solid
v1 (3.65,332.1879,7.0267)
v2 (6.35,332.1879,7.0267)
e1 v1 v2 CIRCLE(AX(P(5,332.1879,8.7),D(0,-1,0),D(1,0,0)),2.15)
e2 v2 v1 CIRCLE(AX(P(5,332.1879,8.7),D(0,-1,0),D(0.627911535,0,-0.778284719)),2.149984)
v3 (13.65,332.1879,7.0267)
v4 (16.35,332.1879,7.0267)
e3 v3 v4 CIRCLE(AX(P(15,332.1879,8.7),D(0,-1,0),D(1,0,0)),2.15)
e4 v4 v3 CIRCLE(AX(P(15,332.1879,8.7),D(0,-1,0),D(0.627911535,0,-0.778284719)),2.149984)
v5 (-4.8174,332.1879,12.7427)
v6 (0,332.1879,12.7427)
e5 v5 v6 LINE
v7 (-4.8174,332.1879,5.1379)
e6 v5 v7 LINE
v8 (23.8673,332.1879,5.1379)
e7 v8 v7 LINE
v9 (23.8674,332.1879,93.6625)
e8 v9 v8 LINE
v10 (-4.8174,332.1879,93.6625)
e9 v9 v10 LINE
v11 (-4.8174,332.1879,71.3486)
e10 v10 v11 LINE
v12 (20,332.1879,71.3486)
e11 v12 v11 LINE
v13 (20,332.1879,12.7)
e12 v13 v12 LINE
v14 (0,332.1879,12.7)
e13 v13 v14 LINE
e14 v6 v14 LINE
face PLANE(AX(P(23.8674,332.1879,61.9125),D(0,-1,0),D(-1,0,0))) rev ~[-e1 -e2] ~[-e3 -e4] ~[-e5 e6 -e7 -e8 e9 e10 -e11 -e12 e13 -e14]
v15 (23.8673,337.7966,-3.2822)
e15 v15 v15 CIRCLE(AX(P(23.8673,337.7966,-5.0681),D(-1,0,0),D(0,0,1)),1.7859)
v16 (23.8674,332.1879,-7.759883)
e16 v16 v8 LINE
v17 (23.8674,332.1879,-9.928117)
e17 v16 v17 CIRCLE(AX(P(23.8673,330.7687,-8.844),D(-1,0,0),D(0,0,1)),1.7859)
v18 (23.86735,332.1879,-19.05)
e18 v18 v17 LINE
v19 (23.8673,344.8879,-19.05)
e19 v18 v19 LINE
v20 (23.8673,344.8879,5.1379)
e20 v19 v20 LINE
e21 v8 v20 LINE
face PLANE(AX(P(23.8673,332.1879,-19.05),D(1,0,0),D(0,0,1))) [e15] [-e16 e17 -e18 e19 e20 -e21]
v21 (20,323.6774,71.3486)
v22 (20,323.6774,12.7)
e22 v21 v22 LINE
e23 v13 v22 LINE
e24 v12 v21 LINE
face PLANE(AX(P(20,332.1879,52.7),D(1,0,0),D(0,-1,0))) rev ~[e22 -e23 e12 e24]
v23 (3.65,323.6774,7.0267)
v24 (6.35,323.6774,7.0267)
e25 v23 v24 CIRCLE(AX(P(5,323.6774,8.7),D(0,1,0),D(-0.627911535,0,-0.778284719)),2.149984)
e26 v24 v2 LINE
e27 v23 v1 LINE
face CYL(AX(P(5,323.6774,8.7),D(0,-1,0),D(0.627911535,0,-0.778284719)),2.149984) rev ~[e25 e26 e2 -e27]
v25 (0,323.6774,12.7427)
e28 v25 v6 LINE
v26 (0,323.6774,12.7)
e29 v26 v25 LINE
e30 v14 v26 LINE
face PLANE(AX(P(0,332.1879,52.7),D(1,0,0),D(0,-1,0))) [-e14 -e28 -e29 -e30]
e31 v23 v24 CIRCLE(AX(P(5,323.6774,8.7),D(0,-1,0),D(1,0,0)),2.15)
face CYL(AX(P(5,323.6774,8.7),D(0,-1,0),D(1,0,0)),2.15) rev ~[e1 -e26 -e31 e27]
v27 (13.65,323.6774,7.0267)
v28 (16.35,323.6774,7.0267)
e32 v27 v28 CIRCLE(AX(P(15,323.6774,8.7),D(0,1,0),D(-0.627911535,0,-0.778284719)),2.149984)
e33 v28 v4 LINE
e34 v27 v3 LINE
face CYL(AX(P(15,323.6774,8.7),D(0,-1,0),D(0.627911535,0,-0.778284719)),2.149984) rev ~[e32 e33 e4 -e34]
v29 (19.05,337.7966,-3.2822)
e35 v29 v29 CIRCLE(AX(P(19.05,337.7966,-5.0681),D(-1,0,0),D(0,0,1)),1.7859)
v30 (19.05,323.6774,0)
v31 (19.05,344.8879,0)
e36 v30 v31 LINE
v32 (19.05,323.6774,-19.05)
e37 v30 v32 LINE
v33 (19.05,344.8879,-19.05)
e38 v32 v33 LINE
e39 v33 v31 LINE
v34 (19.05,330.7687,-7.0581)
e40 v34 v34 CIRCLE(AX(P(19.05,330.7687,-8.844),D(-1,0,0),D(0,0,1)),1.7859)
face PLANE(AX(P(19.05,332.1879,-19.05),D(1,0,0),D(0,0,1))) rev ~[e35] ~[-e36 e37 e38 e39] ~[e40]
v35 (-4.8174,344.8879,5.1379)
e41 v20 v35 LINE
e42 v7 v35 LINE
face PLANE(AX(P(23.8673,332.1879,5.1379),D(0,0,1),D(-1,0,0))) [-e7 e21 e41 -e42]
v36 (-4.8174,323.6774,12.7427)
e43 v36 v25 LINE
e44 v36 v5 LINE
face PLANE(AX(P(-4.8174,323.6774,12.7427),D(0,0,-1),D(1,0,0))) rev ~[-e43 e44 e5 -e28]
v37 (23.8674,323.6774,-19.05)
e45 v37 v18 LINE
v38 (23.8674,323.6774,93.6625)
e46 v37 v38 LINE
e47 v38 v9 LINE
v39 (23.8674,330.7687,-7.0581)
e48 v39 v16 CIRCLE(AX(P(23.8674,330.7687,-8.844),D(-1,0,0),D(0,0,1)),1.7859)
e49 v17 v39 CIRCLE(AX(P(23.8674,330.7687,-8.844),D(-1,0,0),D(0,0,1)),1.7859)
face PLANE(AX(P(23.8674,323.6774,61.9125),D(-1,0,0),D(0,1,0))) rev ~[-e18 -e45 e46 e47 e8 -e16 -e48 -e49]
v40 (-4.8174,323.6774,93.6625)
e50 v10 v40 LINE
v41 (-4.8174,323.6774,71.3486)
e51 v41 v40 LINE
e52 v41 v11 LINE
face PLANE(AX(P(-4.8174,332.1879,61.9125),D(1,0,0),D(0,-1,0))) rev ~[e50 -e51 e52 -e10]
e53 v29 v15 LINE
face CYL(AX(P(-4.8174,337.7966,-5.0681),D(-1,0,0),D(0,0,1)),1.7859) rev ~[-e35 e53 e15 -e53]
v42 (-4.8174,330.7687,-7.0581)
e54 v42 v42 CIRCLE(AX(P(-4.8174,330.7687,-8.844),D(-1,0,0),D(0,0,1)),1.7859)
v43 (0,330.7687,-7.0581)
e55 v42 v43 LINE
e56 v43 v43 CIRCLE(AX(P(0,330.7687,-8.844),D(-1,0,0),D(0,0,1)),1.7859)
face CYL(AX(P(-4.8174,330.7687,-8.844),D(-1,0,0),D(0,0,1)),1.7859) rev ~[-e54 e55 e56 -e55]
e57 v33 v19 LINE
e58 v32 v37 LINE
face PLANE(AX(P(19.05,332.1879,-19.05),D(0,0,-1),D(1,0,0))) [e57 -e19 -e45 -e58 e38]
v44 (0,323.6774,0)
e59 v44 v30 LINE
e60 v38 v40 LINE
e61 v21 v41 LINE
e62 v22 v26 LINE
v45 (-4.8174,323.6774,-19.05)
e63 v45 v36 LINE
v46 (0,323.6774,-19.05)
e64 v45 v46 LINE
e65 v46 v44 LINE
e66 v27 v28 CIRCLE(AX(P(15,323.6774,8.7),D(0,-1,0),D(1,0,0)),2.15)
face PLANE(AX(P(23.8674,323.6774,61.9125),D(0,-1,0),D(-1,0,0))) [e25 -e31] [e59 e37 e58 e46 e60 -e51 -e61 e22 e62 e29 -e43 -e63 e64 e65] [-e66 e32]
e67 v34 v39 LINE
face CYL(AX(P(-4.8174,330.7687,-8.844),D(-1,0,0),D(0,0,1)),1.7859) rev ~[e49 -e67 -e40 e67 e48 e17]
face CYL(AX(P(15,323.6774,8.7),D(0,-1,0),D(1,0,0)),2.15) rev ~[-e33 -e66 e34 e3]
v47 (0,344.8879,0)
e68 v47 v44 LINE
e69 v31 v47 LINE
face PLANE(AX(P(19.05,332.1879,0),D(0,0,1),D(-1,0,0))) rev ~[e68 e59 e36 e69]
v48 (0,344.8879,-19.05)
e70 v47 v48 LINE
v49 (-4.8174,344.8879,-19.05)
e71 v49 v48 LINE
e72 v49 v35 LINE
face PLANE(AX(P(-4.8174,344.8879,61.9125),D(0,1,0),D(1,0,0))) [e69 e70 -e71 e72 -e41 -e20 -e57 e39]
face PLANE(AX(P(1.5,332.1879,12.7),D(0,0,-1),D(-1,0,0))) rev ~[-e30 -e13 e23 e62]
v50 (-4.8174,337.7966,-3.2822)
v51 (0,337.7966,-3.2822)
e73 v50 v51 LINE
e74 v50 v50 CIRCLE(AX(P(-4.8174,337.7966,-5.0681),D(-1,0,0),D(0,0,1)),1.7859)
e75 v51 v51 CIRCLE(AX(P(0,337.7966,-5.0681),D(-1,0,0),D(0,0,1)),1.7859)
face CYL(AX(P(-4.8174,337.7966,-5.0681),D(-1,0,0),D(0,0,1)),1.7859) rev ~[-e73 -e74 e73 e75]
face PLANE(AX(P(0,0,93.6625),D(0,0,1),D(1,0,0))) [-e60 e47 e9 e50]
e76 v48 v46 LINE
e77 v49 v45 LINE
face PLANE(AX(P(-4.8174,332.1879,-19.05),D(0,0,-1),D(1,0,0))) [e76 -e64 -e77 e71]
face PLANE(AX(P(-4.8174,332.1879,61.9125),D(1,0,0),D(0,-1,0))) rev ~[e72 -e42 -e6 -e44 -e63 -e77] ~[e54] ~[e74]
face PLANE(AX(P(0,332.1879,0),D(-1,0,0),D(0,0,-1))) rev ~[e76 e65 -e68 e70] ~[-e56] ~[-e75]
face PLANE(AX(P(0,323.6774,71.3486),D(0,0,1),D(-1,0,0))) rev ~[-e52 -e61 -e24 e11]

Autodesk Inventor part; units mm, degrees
ref_plane "YZ Plane" through (0, 0, 0) normal (1, 0, 0) x (0, 1, 0)
ref_plane "Work Plane1" through (0, 0, 0) normal (0, 0, 1) x (1, 0, 0)
ref_plane "Work Plane2" through (0, 0, 0) normal (0, 0, 1) x (1, 0, 0)
sketch "Sketch2" plane through (0, 0, 0) normal (0, 0, 1) x (1, 0, 0)
  line L0 (0, 0) -> (19.05, 0) projected
  line L1 (19.05, 0) -> (19.05, 431.8) construction
  line L2 (0, 431.8) -> (19.05, 431.8) projected
  line L3 (0, 0) -> (0, 431.8) construction
  line L4 (18.5, 323.6774) -> (1.5, 323.6774) projected
  line L5 (18.5, 323.6774) -> (19.1476, 323.6774)
  line L6 (1.5, 323.6774) -> (0, 323.6774)
  line L7 (-4.8174, 323.6774) -> (23.8674, 323.6774)
  line L8 (23.8674, 323.6774) -> (23.8674, 332.1879)
  line L9 (23.8674, 332.1879) -> (-4.8174, 332.1879)
  line L10 (-4.8174, 332.1879) -> (-4.8174, 323.6774)
  line L11 (9.525, 431.8) -> (9.525, 312.4258) construction
  line L12 (9.525, 327.9326) -> (-4.8174, 327.9326) construction
  line L13 (23.8674, 327.9326) -> (9.525, 327.9326) construction
extrude "Extrusion1" add sketch "Sketch2" along normal blind 61.9125
sketch "Sketch3" plane through (-4.8174, 323.6774, 0) normal (0, -1, 0) x (1, 0, 0)
  arc A0 (8.4674, 58.3733) -> (11.1674, 58.3733) centre (9.8174, 56.7) ccw projected
  arc A1 (18.4674, 58.3733) -> (21.1674, 58.3733) centre (19.8174, 56.7) ccw projected
  arc A2 (11.1674, 7.0267) -> (8.4674, 7.0267) centre (9.8174, 8.7) ccw projected
  arc A3 (21.1674, 7.0267) -> (18.4674, 7.0267) centre (19.8174, 8.7) ccw projected
  circle A4 centre (9.8174, 8.7) radius 2.15
  circle A5 centre (19.8174, 8.7) radius 2.15
  circle A6 centre (9.8174, 56.7) radius 2.15
  circle A7 centre (19.8174, 56.7) radius 2.15
  point P0 (4.8174, 0)
extrude "Extrusion2" cut sketch "Sketch3" against normal through all
sketch "Sketch4" plane through (-4.8174, 332.1879, 0) normal (0, 1, 0) x (1, 0, 0)
  line L0 (4.8174, -14.2) -> (4.8174, -51.2) projected
  line L1 (6.3174, -52.7) -> (23.3174, -52.7) projected
  line L2 (24.8174, -51.2) -> (24.8174, -14.2) projected
  line L3 (23.3174, -12.7) -> (6.3174, -12.7) projected
  line L4 (4.8174, -52.7) -> (24.8174, -52.7)
  line L5 (24.8174, -52.7) -> (24.8174, -12.7)
  line L6 (24.8174, -12.7) -> (4.8174, -12.7)
  line L7 (4.8174, -12.7) -> (4.8174, -52.7)
  point P0 (4.8174, 0)
extrude "Extrusion3" cut sketch "Sketch4" against normal through all
sketch "Sketch6" plane through (0, 0, 0) normal (0, 0, -1) x (-1, 0, 0)
  line L0 (4.8174, 323.6774) -> (-23.8674, 323.6774) projected
  line L1 (4.8174, 332.1879) -> (4.8174, 323.6774) projected
  line L2 (-23.8674, 332.1879) -> (4.8174, 332.1879) projected
  line L3 (-23.8674, 323.6774) -> (-23.8674, 332.1879) projected
  point P0 (0, 0)
extrude "Extrusion4" add sketch "Sketch6" along normal blind 19.05
sketch "Sketch7" plane through (-4.8174, 332.1879, 61.9125) normal (0, 1, 0) x (1, 0, 0)
  line L0 (4.8174, 70.6755) -> (4.8174, 80.9625) projected
  line L1 (4.8174, 61.9125) -> (4.8174, 70.6755) projected
  line L2 (23.8674, 61.9125) -> (23.8674, 70.6755) projected
  line L3 (23.8674, 71.4375) -> (23.8674, 80.9625) projected
  line L4 (23.8674, 61.9125) -> (4.8174, 61.9125)
  line L5 (4.8174, 61.9125) -> (4.8174, 80.9625)
  line L6 (4.8174, 80.9625) -> (23.8674, 80.9625)
  line L7 (23.8674, 80.9625) -> (23.8674, 61.9125)
extrude "Extrusion5" cut sketch "Sketch7" against normal through all
sketch "Sketch8" plane through (-4.8174, 332.1879, 61.9125) normal (0, 1, 0) x (1, 0, 0)
  line L0 (28.6847, 80.9625) -> (28.6847, 0) projected
  line L1 (0, 80.9625) -> (0, 0) projected
  line L2 (4.8174, 61.9125) -> (4.8174, 80.9625) projected
  line L3 (0, 80.9625) -> (4.8174, 80.9625) projected
  line L4 (0, 80.9625) -> (0, 0) projected
  line L5 (28.6847, 0) -> (0, 0) projected
  line L6 (28.6847, 80.9625) -> (28.6847, 0) projected
  line L7 (23.8674, 80.9625) -> (28.6847, 80.9625) projected
  line L8 (23.8674, 80.9625) -> (23.8674, 61.9125) projected
  line L9 (23.8674, 61.9125) -> (4.8174, 61.9125) projected
  line L10 (24.8174, 49.2125) -> (24.8174, 9.2125) projected
  line L11 (24.8174, 9.2125) -> (4.8174, 9.2125) projected
  line L12 (4.8174, 9.2125) -> (4.8174, 49.2125) projected
  line L13 (4.8174, 49.2125) -> (24.8174, 49.2125) projected
  circle A0 centre (9.8174, 5.2125) radius 2.15 projected
  circle A1 centre (9.8174, 53.2125) radius 2.15 projected
  circle A2 centre (19.8174, 53.2125) radius 2.15 projected
  circle A3 centre (19.8174, 5.2125) radius 2.15 projected
  line L14 (28.6847, 56.7746) -> (0, 56.7746)
  line L15 (28.6847, 56.7746) -> (57.3695, 56.7746) construction
  point P0 (4.8174, 61.9125)
  dimension "d10" = 180
extrude "Extrusion6" add sketch "Sketch8" along normal blind 12.7 contours L0 L14 L1 L3 L2 L9 L8 L7
sketch "Sketch10" plane through (23.8674, 323.6774, 61.9125) normal (1, 0, 0) x (0, 0, -1)
  point P0 (61.9125, -323.6774)
sketch "Sketch11" plane through (-4.8174, 323.6774, 61.9125) normal (-1, 0, 0) x (0, 0, 1)
  line L0 (0, 0) -> (-80.9625, 0) projected
  line L1 (0, 8.5105) -> (0, 0) projected
  line L2 (-56.7746, 8.5105) -> (0, 8.5105) projected
  line L3 (-56.7746, 8.5105) -> (-56.7746, 21.2105) projected
  line L4 (-80.9625, 21.2105) -> (-56.7746, 21.2105) projected
  line L5 (-80.9625, 0) -> (-80.9625, 21.2105) projected
  circle A0 centre (-66.9806, 14.1192) radius 1.7859
  circle A1 centre (-70.7565, 7.0913) radius 1.7859
  line L6 (-66.9806, 14.1192) -> (-66.9806, 21.2105) construction
  line L7 (-70.7565, 7.0913) -> (-70.7565, 0) construction
  line L8 (-80.9625, 0) -> (0, 0) construction
  line L9 (-70.7565, 7.0913) -> (-80.9625, 7.0913) construction
  line L10 (-80.9625, 0) -> (-80.9625, 21.2105) construction
  line L11 (-66.9806, 14.1192) -> (-56.7746, 14.1192) construction
  point P0 (-61.9125, -323.6774)
  dimension "d13" = 3.5719
  dimension "d14" = 3.5719
extrude "Extrusion7" cut sketch "Sketch11" against normal through all contours A0 | A1
sketch "Sketch12" plane through (-4.8174, 332.1879, 61.9125) normal (0, 1, 0) x (1, 0, 0)
  point P0 (4.8174, 61.9125)
move faces "Move1" translate (0, 0, 31.75) faces at (4.7442, 329.3511, 61.9125)
delete faces "Delete1" heal yes whole lump no faces at (6.978, 329.3511, 57.5427) (17.143, 329.3511, 56.527)
move faces "Move2" translate (0, 0, 18.6486) faces at (6.6667, 329.3511, 52.7)
sketch "Sketch13" plane through (-4.8174, 323.6774, 93.6625) normal (0, -1, 0) x (1, 0, 0)
  line L0 (0, -88.5246) -> (0, 0) projected
  line L1 (4.8174, -22.3139) -> (0, -22.3139)
  line L2 (0, -22.3139) -> (0, -80.9198)
  line L3 (0, -80.9198) -> (4.8174, -80.9198)
  line L4 (4.8174, -80.9198) -> (4.8174, -22.3139)
  point P0 (4.8174, -93.6625)
extrude "Extrusion8" cut sketch "Sketch13" against normal through all
sketch "Sketch14" plane through (-4.8174, 323.6774, 93.6625) normal (0, -1, 0) x (1, 0, 0)
  line L0 (9.8174, -84.9625) -> (9.8174, -14.9173) construction
  line L1 (19.8174, -84.9625) -> (19.8174, -14.9173) construction
  circle A0 centre (19.8174, -84.9625) radius 2.15 projected
  circle A1 centre (19.8174, -84.9625) radius 2.15
  circle A2 centre (19.8174, -14.9173) radius 1.7859
  circle A3 centre (9.8174, -14.9173) radius 1.7859
  circle A4 centre (19.8174, -84.9625) radius 1.7859
  circle A5 centre (9.8174, -84.9625) radius 1.7859
  point P0 (4.8174, -93.6625)
  dimension "d29" = 3.5719
  dimension "d30" = 3.5719
  dimension "d31" = 3.5719
  dimension "d32" = 3.5719
properties part number "servo mount"
